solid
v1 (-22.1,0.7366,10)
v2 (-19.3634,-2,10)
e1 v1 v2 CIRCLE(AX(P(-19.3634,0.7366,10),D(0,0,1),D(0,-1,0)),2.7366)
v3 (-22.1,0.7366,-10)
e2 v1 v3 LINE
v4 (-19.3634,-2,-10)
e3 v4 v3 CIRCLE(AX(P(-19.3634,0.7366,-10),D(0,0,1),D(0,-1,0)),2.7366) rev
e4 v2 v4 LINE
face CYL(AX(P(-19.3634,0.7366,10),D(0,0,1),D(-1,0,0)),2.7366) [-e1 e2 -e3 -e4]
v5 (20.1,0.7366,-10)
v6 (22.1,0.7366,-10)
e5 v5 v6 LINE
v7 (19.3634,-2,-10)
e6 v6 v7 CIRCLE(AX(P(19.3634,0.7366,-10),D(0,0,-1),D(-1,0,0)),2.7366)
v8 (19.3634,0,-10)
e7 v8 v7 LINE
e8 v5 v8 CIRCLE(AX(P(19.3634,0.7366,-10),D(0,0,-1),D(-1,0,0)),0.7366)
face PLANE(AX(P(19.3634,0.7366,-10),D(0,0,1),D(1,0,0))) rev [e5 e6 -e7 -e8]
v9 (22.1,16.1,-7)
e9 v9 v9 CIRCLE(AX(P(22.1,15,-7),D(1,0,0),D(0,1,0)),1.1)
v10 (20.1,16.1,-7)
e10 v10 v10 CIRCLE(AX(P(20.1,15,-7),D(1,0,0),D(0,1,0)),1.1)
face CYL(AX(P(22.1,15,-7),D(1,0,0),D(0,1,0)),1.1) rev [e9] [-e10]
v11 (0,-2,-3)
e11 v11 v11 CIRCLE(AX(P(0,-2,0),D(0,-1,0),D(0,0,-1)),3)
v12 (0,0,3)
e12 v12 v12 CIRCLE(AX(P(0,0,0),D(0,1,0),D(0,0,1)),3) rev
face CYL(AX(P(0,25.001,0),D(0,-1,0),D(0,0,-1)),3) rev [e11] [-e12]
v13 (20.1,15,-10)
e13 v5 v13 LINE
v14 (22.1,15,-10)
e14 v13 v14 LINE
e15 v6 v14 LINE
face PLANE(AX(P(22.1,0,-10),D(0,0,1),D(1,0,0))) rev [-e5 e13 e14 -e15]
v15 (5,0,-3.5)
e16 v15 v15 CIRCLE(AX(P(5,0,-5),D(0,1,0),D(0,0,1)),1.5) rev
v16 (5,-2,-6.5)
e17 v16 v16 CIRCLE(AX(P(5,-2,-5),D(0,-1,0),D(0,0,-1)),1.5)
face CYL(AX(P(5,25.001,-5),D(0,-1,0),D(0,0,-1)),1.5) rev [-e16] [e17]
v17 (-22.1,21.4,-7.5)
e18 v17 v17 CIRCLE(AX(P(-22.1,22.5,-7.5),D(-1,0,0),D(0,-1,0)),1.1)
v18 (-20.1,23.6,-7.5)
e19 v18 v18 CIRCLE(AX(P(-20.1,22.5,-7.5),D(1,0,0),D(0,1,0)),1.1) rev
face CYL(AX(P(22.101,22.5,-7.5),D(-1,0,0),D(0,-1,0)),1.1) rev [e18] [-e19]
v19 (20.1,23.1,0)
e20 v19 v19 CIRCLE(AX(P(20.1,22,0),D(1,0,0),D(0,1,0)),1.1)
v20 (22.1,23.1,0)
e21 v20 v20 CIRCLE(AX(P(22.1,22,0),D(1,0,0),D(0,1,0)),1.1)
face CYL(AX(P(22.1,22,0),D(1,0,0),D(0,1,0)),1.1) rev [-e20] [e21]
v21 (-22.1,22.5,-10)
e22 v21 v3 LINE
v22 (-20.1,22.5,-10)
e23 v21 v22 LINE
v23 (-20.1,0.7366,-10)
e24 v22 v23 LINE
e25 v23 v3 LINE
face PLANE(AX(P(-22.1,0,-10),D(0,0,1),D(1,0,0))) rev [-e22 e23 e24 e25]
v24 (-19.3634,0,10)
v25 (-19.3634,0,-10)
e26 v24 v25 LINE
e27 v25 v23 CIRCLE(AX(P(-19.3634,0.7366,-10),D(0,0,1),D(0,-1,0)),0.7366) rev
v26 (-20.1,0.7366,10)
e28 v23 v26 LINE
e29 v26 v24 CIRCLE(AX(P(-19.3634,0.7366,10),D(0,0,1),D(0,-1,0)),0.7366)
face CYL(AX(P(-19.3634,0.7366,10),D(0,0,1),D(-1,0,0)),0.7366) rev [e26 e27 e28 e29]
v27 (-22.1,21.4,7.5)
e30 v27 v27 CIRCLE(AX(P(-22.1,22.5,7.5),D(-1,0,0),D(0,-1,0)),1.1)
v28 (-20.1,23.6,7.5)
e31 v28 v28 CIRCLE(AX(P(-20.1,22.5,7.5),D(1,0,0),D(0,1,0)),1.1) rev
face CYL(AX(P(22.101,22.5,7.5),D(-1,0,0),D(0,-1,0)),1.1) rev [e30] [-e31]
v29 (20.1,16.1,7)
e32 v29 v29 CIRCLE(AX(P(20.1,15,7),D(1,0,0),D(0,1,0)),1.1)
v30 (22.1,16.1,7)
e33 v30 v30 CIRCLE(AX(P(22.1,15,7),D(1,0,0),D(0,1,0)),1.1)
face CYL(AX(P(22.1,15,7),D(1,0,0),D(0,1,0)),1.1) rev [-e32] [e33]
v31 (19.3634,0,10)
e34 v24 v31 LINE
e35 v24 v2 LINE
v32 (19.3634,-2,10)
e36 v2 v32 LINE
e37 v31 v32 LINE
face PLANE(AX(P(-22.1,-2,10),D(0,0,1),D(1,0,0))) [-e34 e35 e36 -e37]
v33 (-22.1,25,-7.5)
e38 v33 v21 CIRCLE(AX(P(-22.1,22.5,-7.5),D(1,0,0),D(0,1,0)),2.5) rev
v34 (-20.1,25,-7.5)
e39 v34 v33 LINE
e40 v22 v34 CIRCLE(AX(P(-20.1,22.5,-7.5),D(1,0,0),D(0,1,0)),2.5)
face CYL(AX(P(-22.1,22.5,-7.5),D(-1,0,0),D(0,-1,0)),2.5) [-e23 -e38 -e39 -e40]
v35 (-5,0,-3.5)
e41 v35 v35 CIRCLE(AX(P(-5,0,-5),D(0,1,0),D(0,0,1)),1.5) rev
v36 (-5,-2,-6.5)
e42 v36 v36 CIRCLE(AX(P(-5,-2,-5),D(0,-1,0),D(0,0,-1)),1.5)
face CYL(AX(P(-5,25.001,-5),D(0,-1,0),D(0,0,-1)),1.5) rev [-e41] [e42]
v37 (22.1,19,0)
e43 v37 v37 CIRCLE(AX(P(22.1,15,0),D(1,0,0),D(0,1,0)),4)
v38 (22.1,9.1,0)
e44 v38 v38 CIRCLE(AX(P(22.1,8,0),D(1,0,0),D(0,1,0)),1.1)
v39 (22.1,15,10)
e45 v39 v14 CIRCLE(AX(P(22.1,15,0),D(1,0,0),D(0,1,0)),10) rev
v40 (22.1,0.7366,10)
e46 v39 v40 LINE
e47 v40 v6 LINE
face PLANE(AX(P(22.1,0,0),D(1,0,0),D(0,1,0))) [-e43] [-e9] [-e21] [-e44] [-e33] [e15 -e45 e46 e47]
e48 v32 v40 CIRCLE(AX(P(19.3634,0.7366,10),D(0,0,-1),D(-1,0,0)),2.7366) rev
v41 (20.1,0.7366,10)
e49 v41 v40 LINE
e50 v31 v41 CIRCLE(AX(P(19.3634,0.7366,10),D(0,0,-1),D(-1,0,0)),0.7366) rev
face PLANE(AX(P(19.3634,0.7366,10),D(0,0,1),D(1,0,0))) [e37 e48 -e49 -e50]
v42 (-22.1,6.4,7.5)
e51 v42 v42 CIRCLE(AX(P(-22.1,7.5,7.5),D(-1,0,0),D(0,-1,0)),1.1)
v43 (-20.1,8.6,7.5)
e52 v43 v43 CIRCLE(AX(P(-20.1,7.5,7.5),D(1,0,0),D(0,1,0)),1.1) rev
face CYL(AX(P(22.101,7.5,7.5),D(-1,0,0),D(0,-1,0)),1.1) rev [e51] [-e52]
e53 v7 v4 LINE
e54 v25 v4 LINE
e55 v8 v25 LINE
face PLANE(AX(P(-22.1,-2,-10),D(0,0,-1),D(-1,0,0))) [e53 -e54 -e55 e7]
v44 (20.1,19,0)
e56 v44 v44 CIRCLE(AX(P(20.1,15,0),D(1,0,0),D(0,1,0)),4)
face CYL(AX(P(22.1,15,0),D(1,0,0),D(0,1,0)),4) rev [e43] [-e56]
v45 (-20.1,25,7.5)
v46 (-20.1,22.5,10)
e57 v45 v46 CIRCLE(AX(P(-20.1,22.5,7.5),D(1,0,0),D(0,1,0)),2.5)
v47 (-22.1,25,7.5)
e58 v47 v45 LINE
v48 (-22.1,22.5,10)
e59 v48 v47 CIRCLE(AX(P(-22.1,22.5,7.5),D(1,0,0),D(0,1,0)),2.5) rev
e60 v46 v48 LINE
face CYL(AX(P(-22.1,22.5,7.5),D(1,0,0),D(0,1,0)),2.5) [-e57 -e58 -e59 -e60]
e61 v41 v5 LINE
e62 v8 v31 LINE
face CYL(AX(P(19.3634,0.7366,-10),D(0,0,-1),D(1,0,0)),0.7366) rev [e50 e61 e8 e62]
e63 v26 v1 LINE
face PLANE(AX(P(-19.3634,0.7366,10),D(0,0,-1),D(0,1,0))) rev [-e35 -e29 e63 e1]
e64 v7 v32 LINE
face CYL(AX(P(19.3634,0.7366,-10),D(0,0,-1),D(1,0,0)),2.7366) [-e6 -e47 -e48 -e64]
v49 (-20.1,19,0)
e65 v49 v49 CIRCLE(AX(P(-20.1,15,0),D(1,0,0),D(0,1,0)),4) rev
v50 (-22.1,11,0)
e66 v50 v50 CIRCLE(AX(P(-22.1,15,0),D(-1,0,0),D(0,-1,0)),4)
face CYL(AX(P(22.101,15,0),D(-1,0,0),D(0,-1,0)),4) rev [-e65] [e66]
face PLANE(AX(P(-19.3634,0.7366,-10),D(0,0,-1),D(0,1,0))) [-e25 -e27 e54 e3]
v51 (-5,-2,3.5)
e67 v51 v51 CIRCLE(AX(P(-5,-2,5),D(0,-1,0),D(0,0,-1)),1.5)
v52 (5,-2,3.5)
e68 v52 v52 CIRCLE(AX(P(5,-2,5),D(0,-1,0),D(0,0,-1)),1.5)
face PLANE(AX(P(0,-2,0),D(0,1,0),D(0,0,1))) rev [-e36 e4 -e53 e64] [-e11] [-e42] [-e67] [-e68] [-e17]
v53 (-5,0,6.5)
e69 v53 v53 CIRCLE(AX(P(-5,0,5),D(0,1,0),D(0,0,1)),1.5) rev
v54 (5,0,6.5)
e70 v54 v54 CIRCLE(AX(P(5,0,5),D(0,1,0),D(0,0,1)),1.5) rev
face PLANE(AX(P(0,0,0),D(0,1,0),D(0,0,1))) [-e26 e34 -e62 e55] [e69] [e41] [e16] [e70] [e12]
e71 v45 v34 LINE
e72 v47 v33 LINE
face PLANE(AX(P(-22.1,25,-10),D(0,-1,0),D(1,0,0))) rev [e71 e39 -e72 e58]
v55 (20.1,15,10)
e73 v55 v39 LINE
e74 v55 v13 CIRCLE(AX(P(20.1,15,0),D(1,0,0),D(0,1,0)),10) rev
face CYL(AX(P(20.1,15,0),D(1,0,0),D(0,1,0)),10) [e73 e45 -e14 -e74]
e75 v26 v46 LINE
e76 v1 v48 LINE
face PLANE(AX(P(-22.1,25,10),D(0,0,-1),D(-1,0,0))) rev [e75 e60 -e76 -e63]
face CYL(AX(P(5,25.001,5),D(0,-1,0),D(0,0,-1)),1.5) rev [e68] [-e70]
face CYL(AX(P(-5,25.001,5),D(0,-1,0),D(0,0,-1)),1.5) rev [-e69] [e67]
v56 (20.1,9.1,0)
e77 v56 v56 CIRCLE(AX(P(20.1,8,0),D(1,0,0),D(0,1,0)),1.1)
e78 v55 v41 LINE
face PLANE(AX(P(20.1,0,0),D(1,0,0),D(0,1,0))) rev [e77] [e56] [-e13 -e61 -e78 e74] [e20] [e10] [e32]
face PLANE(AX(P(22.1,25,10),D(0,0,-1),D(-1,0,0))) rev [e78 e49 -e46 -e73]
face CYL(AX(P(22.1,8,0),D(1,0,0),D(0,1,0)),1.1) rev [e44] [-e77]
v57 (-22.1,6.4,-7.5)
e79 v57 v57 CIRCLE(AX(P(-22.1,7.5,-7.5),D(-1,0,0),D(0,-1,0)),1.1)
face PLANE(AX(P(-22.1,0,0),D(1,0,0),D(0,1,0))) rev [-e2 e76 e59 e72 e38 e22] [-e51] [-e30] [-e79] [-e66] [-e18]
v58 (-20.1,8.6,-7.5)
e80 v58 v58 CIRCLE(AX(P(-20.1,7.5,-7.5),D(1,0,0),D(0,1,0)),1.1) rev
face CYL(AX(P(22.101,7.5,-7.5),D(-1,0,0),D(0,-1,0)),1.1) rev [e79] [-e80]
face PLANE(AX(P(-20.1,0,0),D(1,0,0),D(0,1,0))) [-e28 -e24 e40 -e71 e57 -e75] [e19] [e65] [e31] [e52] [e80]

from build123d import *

# Parameters (mm, degrees)
SKETCH_1_W                         = 44.2
SKETCH_1_H                         = 20
SM_BASE_FLANGE_1_DEPTH             = 2
SM_EDGE_FLANGE_1_STRIP_W           = 9.4732
SM_EDGE_FLANGE_1_STRIP_H           = 2
SM_EDGE_FLANGE_1_STRIP_CUT_DEPTH   = 20
SM_EDGE_FLANGE_1_STRIP_2_W         = 9.4732
SM_EDGE_FLANGE_1_STRIP_2_H         = 2
SM_EDGE_FLANGE_1_STRIP_CUT_2_DEPTH = 20
SM_EDGE_FLANGE_1_DEPTH             = 20
SM_EDGE_FLANGE_1_BEND_DEPTH        = 20
CUT_EXTRUDE_1_REACH                = 53.756
SKETCH_14_R                        = 4
SKETCH_14_R_2                      = 1.1
CUT_EXTRUDE_2_REACH                = 53.756
SKETCH_15_R                        = 4
SKETCH_15_R_2                      = 1.1
FILLET_4_R                         = 2.5
FILLET_5_R                         = 2.5
CUT_EXTRUDE_3_REACH                = 38.296
SKETCH_16_R                        = 3
SKETCH_16_R_2                      = 1.5


# Sheet-metal steps are written as plain solids
with BuildPart() as part:
    # Sketch 1 → 基体-法兰1 (new body)
    with BuildSketch(Plane(origin=(0, 0, 0), x_dir=(1, 0, 0), z_dir=(0, 1, 0))):
        Rectangle(SKETCH_1_W, SKETCH_1_H)
    extrude(amount=-SM_BASE_FLANGE_1_DEPTH)

    # 边线-法兰1 strip (across the edge) → 边线-法兰1 strip cut (cut)
    with BuildSketch(Plane(origin=(-22.1, 0, -10), x_dir=(1, 0, 0), z_dir=(0, 0, 1))):
        with Locations((-2, -1)):
            Rectangle(SM_EDGE_FLANGE_1_STRIP_W, SM_EDGE_FLANGE_1_STRIP_H)
    extrude(amount=SM_EDGE_FLANGE_1_STRIP_CUT_DEPTH, mode=Mode.SUBTRACT)

    # 边线-法兰1 strip 2 (across the edge) → 边线-法兰1 strip cut 2 (cut)
    with BuildSketch(Plane(origin=(22.1, 0, 10), x_dir=(-1, 0, 0), z_dir=(0, 0, -1))):
        with Locations((-2, -1)):
            Rectangle(SM_EDGE_FLANGE_1_STRIP_2_W, SM_EDGE_FLANGE_1_STRIP_2_H)
    extrude(amount=SM_EDGE_FLANGE_1_STRIP_CUT_2_DEPTH, mode=Mode.SUBTRACT)

    # 边线-法兰1 section (across the edge) → 边线-法兰1 (add)
    with BuildSketch(Plane(origin=(-22.1, 0, -10), x_dir=(1, 0, 0), z_dir=(0, 0, 1))):
        with BuildLine():
            Line((0, 0.7366), (0, 25))
            Line((0, 25), (2, 25))
            Line((2, 25), (2, 0.7366))
            ThreePointArc((2, 0.7366), (2.215745145, 0.215745145), (2.7366, 0))
            Line((2.7366, 0), (2.7366, -2))
            ThreePointArc((2.7366, -2), (0.801531583, -1.198468417), (0, 0.7366))
        make_face()
    extrude(amount=SM_EDGE_FLANGE_1_DEPTH)

    # 边线-法兰1 section 2 (across the edge) → 边线-法兰1 bend (add)
    with BuildSketch(Plane(origin=(22.1, 0, 10), x_dir=(-1, 0, 0), z_dir=(0, 0, -1))):
        with BuildLine():
            Line((0, 0.7366), (0, 25))
            Line((0, 25), (2, 25))
            Line((2, 25), (2, 0.7366))
            ThreePointArc((2, 0.7366), (2.215745145, 0.215745145), (2.7366, 0))
            Line((2.7366, 0), (2.7366, -2))
            ThreePointArc((2.7366, -2), (0.801531583, -1.198468417), (0, 0.7366))
        make_face()
    extrude(amount=SM_EDGE_FLANGE_1_BEND_DEPTH)

    # 草图14 → 切除-拉伸1 (cut, up to next)
    with BuildSketch(Plane(origin=(22.1, 0, 0), x_dir=(0, 0, -1), z_dir=(1, 0, 0)), mode=Mode.PRIVATE) as cut_extrude_1_sk1:
        with BuildLine():
            ThreePointArc((-10, 15), (-7.071067812, 22.071067812), (0, 25))
            Line((0, 25), (-10, 25))
            Line((-10, 25), (-10, 15))
        make_face()
    cut_extrude_1_tool1 = extrude(cut_extrude_1_sk1.sketch, amount=-CUT_EXTRUDE_1_REACH, mode=Mode.PRIVATE) & part.part
    # 草图14 → 切除-拉伸1 (cut, up to next)
    with BuildSketch(Plane(origin=(22.1, 0, 0), x_dir=(0, 0, -1), z_dir=(1, 0, 0)), mode=Mode.PRIVATE) as cut_extrude_1_sk2:
        with BuildLine():
            ThreePointArc((0, 25), (7.071067812, 22.071067812), (10, 15))
            Line((10, 15), (10, 25))
            Line((10, 25), (0, 25))
        make_face()
    cut_extrude_1_tool2 = extrude(cut_extrude_1_sk2.sketch, amount=-CUT_EXTRUDE_1_REACH, mode=Mode.PRIVATE) & part.part
    # 草图14 → 切除-拉伸1 (cut, up to next)
    with BuildSketch(Plane(origin=(22.1, 0, 0), x_dir=(0, 0, -1), z_dir=(1, 0, 0)), mode=Mode.PRIVATE) as cut_extrude_1_sk3:
        with Locations(Location((0, 15, 0), (0, 0, 90))):
            Circle(SKETCH_14_R)
    cut_extrude_1_tool3 = extrude(cut_extrude_1_sk3.sketch, amount=-CUT_EXTRUDE_1_REACH, mode=Mode.PRIVATE) & part.part
    # 草图14 → 切除-拉伸1 (cut, up to next)
    with BuildSketch(Plane(origin=(22.1, 0, 0), x_dir=(0, 0, -1), z_dir=(1, 0, 0)), mode=Mode.PRIVATE) as cut_extrude_1_sk4:
        with Locations(Location((-7, 15, 0), (0, 0, 90))):
            Circle(SKETCH_14_R_2)
    cut_extrude_1_tool4 = extrude(cut_extrude_1_sk4.sketch, amount=-CUT_EXTRUDE_1_REACH, mode=Mode.PRIVATE) & part.part
    # 草图14 → 切除-拉伸1 (cut, up to next)
    with BuildSketch(Plane(origin=(22.1, 0, 0), x_dir=(0, 0, -1), z_dir=(1, 0, 0)), mode=Mode.PRIVATE) as cut_extrude_1_sk5:
        with Locations(Location((0, 22, 0), (0, 0, 90))):
            Circle(SKETCH_14_R_2)
    cut_extrude_1_tool5 = extrude(cut_extrude_1_sk5.sketch, amount=-CUT_EXTRUDE_1_REACH, mode=Mode.PRIVATE) & part.part
    # 草图14 → 切除-拉伸1 (cut, up to next)
    with BuildSketch(Plane(origin=(22.1, 0, 0), x_dir=(0, 0, -1), z_dir=(1, 0, 0)), mode=Mode.PRIVATE) as cut_extrude_1_sk6:
        with Locations(Location((7, 15, 0), (0, 0, 90))):
            Circle(SKETCH_14_R_2)
    cut_extrude_1_tool6 = extrude(cut_extrude_1_sk6.sketch, amount=-CUT_EXTRUDE_1_REACH, mode=Mode.PRIVATE) & part.part
    # 草图14 → 切除-拉伸1 (cut, up to next)
    with BuildSketch(Plane(origin=(22.1, 0, 0), x_dir=(0, 0, -1), z_dir=(1, 0, 0)), mode=Mode.PRIVATE) as cut_extrude_1_sk7:
        with Locations(Location((0, 8, 0), (0, 0, 90))):
            Circle(SKETCH_14_R_2)
    cut_extrude_1_tool7 = extrude(cut_extrude_1_sk7.sketch, amount=-CUT_EXTRUDE_1_REACH, mode=Mode.PRIVATE) & part.part
    add(cut_extrude_1_tool1.solids().sort_by_distance((22.1, 22.766321, 7.766321))[0], mode=Mode.SUBTRACT)
    add(cut_extrude_1_tool2.solids().sort_by_distance((22.1, 22.766321, -7.766321))[0], mode=Mode.SUBTRACT)
    add(cut_extrude_1_tool3.solids().sort_by_distance((22.1, 15, 0))[0], mode=Mode.SUBTRACT)
    add(cut_extrude_1_tool4.solids().sort_by_distance((22.1, 15, 7))[0], mode=Mode.SUBTRACT)
    add(cut_extrude_1_tool5.solids().sort_by_distance((22.1, 22, 0))[0], mode=Mode.SUBTRACT)
    add(cut_extrude_1_tool6.solids().sort_by_distance((22.1, 15, -7))[0], mode=Mode.SUBTRACT)
    add(cut_extrude_1_tool7.solids().sort_by_distance((22.1, 8, 0))[0], mode=Mode.SUBTRACT)

    # 草图15 → 切除-拉伸2 (cut, up to next)
    with BuildSketch(Plane.ZY.offset(22.1), mode=Mode.PRIVATE) as cut_extrude_2_sk1:
        with Locations(Location((0, 15, 0), (0, 0, 90))):
            Circle(SKETCH_15_R)
    cut_extrude_2_tool1 = extrude(cut_extrude_2_sk1.sketch, amount=-CUT_EXTRUDE_2_REACH, mode=Mode.PRIVATE) & part.part
    # 草图15 → 切除-拉伸2 (cut, up to next)
    with BuildSketch(Plane.ZY.offset(22.1), mode=Mode.PRIVATE) as cut_extrude_2_sk2:
        with Locations(Location((-7.5, 22.5, 0), (0, 0, 270))):
            Circle(SKETCH_15_R_2)
    cut_extrude_2_tool2 = extrude(cut_extrude_2_sk2.sketch, amount=-CUT_EXTRUDE_2_REACH, mode=Mode.PRIVATE) & part.part
    # 草图15 → 切除-拉伸2 (cut, up to next)
    with BuildSketch(Plane.ZY.offset(22.1), mode=Mode.PRIVATE) as cut_extrude_2_sk3:
        with Locations(Location((-7.5, 7.5, 0), (0, 0, 270))):
            Circle(SKETCH_15_R_2)
    cut_extrude_2_tool3 = extrude(cut_extrude_2_sk3.sketch, amount=-CUT_EXTRUDE_2_REACH, mode=Mode.PRIVATE) & part.part
    # 草图15 → 切除-拉伸2 (cut, up to next)
    with BuildSketch(Plane.ZY.offset(22.1), mode=Mode.PRIVATE) as cut_extrude_2_sk4:
        with Locations(Location((7.5, 7.5, 0), (0, 0, 270))):
            Circle(SKETCH_15_R_2)
    cut_extrude_2_tool4 = extrude(cut_extrude_2_sk4.sketch, amount=-CUT_EXTRUDE_2_REACH, mode=Mode.PRIVATE) & part.part
    # 草图15 → 切除-拉伸2 (cut, up to next)
    with BuildSketch(Plane.ZY.offset(22.1), mode=Mode.PRIVATE) as cut_extrude_2_sk5:
        with Locations(Location((7.5, 22.5, 0), (0, 0, 270))):
            Circle(SKETCH_15_R_2)
    cut_extrude_2_tool5 = extrude(cut_extrude_2_sk5.sketch, amount=-CUT_EXTRUDE_2_REACH, mode=Mode.PRIVATE) & part.part
    add(cut_extrude_2_tool1.solids().sort_by_distance((-22.1, 15, 0))[0], mode=Mode.SUBTRACT)
    add(cut_extrude_2_tool2.solids().sort_by_distance((-22.1, 22.5, -7.5))[0], mode=Mode.SUBTRACT)
    add(cut_extrude_2_tool3.solids().sort_by_distance((-22.1, 7.5, -7.5))[0], mode=Mode.SUBTRACT)
    add(cut_extrude_2_tool4.solids().sort_by_distance((-22.1, 7.5, 7.5))[0], mode=Mode.SUBTRACT)
    add(cut_extrude_2_tool5.solids().sort_by_distance((-22.1, 22.5, 7.5))[0], mode=Mode.SUBTRACT)

    # 圆角4
    fillet_4_edges = [part.edges().sort_by_distance(p)[0] for p in [
        (-21.1, 25, -10),
    ]]
    fillet(fillet_4_edges, radius=FILLET_4_R)

    # 圆角5
    fillet_5_edges = [part.edges().sort_by_distance(p)[0] for p in [
        (-21.1, 25, 10),
    ]]
    fillet(fillet_5_edges, radius=FILLET_5_R)

    # 草图16 → 切除-拉伸3 (cut, up to next)
    with BuildSketch(Plane.XZ.offset(2), mode=Mode.PRIVATE) as cut_extrude_3_sk1:
        with Locations(Location((0, 0, 0), (0, 0, 270))):
            Circle(SKETCH_16_R)
    cut_extrude_3_tool1 = extrude(cut_extrude_3_sk1.sketch, amount=-CUT_EXTRUDE_3_REACH, mode=Mode.PRIVATE) & part.part
    # 草图16 → 切除-拉伸3 (cut, up to next)
    with BuildSketch(Plane.XZ.offset(2), mode=Mode.PRIVATE) as cut_extrude_3_sk2:
        with Locations(Location((-5, 5, 0), (0, 0, 270))):
            Circle(SKETCH_16_R_2)
    cut_extrude_3_tool2 = extrude(cut_extrude_3_sk2.sketch, amount=-CUT_EXTRUDE_3_REACH, mode=Mode.PRIVATE) & part.part
    # 草图16 → 切除-拉伸3 (cut, up to next)
    with BuildSketch(Plane.XZ.offset(2), mode=Mode.PRIVATE) as cut_extrude_3_sk3:
        with Locations(Location((5, 5, 0), (0, 0, 270))):
            Circle(SKETCH_16_R_2)
    cut_extrude_3_tool3 = extrude(cut_extrude_3_sk3.sketch, amount=-CUT_EXTRUDE_3_REACH, mode=Mode.PRIVATE) & part.part
    # 草图16 → 切除-拉伸3 (cut, up to next)
    with BuildSketch(Plane.XZ.offset(2), mode=Mode.PRIVATE) as cut_extrude_3_sk4:
        with Locations(Location((5, -5, 0), (0, 0, 270))):
            Circle(SKETCH_16_R_2)
    cut_extrude_3_tool4 = extrude(cut_extrude_3_sk4.sketch, amount=-CUT_EXTRUDE_3_REACH, mode=Mode.PRIVATE) & part.part
    # 草图16 → 切除-拉伸3 (cut, up to next)
    with BuildSketch(Plane.XZ.offset(2), mode=Mode.PRIVATE) as cut_extrude_3_sk5:
        with Locations(Location((-5, -5, 0), (0, 0, 270))):
            Circle(SKETCH_16_R_2)
    cut_extrude_3_tool5 = extrude(cut_extrude_3_sk5.sketch, amount=-CUT_EXTRUDE_3_REACH, mode=Mode.PRIVATE) & part.part
    add(cut_extrude_3_tool1.solids().sort_by_distance((0, -2, 0))[0], mode=Mode.SUBTRACT)
    add(cut_extrude_3_tool2.solids().sort_by_distance((-5, -2, 5))[0], mode=Mode.SUBTRACT)
    add(cut_extrude_3_tool3.solids().sort_by_distance((5, -2, 5))[0], mode=Mode.SUBTRACT)
    add(cut_extrude_3_tool4.solids().sort_by_distance((5, -2, -5))[0], mode=Mode.SUBTRACT)
    add(cut_extrude_3_tool5.solids().sort_by_distance((-5, -2, -5))[0], mode=Mode.SUBTRACT)


solid = part.part
